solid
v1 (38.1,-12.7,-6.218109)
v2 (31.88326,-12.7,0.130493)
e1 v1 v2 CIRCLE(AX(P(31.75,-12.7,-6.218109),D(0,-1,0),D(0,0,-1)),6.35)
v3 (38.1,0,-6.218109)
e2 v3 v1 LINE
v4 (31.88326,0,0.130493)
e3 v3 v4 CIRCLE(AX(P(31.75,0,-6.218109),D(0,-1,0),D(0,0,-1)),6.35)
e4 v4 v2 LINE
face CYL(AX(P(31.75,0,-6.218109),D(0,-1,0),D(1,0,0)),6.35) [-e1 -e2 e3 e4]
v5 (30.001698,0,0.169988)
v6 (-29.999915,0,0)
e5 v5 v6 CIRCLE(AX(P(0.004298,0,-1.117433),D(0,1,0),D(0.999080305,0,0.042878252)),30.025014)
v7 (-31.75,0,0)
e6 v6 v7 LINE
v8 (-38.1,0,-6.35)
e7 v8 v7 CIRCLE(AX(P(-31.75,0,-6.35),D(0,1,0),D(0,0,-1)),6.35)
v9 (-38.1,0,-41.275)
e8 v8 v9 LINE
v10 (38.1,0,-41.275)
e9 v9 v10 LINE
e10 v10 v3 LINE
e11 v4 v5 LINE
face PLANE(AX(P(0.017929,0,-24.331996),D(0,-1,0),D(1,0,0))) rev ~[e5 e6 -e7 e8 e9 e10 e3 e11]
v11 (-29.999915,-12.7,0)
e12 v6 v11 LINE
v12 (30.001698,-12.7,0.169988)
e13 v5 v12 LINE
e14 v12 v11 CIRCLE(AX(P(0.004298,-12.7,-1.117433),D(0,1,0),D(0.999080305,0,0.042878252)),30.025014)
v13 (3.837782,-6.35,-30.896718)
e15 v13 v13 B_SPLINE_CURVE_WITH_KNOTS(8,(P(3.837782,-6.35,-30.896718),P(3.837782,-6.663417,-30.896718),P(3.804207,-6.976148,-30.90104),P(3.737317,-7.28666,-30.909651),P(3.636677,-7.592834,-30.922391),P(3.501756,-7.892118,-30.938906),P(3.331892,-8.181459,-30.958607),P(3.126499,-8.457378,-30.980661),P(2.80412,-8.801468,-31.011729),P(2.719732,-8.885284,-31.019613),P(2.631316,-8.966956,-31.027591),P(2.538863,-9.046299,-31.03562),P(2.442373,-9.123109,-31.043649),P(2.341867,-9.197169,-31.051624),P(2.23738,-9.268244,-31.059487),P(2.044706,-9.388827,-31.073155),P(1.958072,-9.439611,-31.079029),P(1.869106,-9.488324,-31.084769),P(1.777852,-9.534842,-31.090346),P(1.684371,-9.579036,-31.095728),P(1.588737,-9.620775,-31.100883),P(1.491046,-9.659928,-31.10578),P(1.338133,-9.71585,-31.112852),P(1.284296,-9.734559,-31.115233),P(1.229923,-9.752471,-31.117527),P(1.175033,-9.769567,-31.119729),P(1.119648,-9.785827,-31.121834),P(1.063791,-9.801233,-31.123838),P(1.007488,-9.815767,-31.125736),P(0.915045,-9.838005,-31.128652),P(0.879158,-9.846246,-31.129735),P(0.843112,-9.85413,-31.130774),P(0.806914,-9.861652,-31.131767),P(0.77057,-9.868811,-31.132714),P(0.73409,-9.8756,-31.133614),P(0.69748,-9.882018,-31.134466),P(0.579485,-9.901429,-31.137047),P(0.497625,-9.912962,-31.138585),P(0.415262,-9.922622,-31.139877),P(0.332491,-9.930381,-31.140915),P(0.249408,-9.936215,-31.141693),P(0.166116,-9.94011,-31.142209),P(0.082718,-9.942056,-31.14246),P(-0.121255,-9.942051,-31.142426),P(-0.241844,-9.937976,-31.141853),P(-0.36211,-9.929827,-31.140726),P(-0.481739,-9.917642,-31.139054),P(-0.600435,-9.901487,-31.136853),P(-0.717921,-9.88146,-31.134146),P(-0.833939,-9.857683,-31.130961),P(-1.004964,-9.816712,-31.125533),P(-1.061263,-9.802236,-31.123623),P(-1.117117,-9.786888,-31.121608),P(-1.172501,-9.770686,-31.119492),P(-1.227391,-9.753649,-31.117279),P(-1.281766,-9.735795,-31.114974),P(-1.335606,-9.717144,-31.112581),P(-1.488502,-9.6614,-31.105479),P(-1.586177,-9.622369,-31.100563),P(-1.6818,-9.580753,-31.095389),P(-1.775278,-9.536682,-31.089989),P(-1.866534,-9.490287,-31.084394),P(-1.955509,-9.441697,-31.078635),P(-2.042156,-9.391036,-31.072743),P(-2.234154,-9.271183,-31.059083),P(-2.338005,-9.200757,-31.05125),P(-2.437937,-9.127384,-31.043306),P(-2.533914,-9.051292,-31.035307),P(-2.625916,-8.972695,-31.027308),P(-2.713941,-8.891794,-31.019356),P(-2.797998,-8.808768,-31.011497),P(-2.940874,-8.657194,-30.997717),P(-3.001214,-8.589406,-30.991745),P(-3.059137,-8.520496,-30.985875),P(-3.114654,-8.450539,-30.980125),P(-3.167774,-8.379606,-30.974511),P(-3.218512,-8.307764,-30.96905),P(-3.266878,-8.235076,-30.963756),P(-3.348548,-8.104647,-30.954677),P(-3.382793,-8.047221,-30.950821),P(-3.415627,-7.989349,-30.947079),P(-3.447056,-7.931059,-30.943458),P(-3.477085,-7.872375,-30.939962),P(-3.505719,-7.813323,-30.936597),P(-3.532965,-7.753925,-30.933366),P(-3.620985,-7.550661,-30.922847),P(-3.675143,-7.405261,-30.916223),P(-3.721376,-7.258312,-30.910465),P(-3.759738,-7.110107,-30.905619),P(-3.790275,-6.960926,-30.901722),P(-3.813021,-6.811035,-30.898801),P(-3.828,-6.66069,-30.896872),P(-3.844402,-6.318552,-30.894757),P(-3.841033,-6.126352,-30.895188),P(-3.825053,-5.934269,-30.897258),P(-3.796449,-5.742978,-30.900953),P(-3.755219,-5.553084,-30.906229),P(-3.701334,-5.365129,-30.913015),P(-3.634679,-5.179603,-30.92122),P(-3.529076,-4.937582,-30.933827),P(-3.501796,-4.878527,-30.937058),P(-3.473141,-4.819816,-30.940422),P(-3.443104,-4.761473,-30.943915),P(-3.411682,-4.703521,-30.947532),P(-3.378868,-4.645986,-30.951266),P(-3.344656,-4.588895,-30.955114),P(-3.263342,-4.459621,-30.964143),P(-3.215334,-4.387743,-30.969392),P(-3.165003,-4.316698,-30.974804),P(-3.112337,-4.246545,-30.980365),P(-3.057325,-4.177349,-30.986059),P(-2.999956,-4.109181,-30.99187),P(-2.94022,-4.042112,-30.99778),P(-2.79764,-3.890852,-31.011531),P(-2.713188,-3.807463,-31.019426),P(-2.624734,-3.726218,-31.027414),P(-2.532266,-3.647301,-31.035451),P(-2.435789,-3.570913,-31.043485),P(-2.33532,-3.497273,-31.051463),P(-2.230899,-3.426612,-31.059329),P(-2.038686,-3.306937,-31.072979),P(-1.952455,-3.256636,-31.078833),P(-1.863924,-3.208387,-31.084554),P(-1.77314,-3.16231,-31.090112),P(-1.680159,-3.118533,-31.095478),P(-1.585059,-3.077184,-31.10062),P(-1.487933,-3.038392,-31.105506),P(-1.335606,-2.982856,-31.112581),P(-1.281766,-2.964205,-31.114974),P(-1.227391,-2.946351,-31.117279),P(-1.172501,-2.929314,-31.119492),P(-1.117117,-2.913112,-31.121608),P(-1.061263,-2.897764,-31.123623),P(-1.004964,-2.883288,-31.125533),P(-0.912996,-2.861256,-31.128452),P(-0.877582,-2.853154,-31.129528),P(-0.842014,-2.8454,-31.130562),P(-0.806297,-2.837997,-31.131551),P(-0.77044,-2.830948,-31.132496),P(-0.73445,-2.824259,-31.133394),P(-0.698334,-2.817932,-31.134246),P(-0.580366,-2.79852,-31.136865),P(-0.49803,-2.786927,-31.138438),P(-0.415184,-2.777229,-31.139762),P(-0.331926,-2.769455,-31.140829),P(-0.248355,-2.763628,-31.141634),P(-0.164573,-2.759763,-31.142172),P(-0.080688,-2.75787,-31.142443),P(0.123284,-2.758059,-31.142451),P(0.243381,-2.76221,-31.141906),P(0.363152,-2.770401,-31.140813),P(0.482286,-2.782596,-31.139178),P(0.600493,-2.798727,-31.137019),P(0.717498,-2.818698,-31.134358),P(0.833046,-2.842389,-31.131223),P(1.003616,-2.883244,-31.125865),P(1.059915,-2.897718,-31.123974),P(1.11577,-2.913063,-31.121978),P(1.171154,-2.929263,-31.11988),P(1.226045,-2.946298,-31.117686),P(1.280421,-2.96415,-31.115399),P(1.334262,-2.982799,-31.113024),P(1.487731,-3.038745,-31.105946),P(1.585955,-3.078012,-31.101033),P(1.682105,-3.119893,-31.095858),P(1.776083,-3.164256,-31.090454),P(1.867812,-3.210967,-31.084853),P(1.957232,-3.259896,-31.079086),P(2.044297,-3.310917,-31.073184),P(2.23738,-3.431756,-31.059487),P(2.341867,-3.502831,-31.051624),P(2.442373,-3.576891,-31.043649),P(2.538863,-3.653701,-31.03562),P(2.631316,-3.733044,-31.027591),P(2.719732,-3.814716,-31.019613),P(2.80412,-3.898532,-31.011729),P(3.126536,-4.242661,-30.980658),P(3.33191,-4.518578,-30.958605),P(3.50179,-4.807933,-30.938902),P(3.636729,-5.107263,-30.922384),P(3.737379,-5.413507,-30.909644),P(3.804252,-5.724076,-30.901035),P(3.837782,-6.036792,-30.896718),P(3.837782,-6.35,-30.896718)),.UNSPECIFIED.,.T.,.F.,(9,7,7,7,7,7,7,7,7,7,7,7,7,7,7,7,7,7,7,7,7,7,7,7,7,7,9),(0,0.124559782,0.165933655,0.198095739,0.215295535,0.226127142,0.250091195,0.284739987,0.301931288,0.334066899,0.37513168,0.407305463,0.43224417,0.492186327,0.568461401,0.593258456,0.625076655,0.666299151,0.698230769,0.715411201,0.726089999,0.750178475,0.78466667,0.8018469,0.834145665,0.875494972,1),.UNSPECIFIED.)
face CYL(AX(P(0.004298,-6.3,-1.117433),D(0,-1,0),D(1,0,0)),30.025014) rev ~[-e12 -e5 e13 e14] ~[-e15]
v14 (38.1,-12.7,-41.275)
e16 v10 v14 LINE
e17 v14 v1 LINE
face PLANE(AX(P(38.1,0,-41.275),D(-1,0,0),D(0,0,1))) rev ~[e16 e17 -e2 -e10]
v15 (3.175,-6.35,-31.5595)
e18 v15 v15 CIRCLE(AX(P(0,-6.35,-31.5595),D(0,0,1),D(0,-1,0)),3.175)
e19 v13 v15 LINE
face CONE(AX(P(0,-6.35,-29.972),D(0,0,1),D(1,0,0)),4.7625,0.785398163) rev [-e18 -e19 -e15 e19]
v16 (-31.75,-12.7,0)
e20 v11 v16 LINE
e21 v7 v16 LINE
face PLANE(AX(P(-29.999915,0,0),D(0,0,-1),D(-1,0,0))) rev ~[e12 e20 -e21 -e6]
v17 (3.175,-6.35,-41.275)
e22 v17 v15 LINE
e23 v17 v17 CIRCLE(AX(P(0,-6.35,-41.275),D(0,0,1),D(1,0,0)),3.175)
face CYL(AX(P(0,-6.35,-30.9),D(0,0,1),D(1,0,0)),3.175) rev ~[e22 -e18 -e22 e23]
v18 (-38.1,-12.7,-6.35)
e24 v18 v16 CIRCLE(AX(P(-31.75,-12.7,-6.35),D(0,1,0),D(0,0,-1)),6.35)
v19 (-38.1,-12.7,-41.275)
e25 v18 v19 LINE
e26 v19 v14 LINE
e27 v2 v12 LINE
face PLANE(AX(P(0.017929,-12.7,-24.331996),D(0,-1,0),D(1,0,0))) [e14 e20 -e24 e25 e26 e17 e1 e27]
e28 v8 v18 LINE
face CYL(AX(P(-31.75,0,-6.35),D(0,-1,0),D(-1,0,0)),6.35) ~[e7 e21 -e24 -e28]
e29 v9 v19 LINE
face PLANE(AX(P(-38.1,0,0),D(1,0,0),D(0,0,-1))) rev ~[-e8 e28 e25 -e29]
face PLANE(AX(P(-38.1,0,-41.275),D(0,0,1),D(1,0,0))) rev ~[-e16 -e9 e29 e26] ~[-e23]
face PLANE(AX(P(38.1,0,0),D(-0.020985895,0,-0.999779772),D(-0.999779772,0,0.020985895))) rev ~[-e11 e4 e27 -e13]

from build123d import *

# Parameters (mm, degrees)
F1_DEPTH    = 12.7
F3_R        = 4.7625
F4_DEPTH    = 6.35
F5_R        = 3.175
F6_DEPTH    = 12.7
F7_S5_R     = 30.0250138604
F7_T6_DEPTH = 8
F7_S7_R     = 3.175
F7_T8_DEPTH = 8
F8_R        = 6.35


# Not quite as in the source:
# - a fillet or chamfer that OpenCascade refuses, or shapes differently, is made with other operations: its cross-section is extruded or revolved along the edge and cut away or added


with BuildPart() as f1:
    # F0 (on Front) → F1 (new body)
    with BuildSketch(Plane.XZ):
        with BuildLine():
            Line((-38.1, 0), (-38.1, -41.275))
            Line((-38.1, -41.275), (38.1, -41.275))
            Line((38.1, -41.275), (38.1, 0))
            Line((38.1, 0), (30.0016984668, 0.169987541))
            ThreePointArc((30.0016984668, 0.169987541), (0.0893604764, -31.1423259445), (-29.9999146, 0))
            Line((-29.9999146, 0), (-38.1, 0))
        make_face()
    extrude(amount=F1_DEPTH)

    # F3 (on offset) → F4 (cut)
    with BuildSketch(Plane.XY.offset(-25.4)):
        with Locations((0, -6.35)):
            Circle(F3_R)
    extrude(amount=-F4_DEPTH, mode=Mode.SUBTRACT)

    # F5 (on face) → F6 (cut)
    with BuildSketch(Plane.XY.offset(-31.75)):
        with Locations((0, -6.35)):
            Circle(F5_R)
    extrude(amount=-F6_DEPTH, mode=Mode.SUBTRACT)

    # F7: chamfer of 1.778 on 1 edges, made by hand


with BuildPart() as f7_tool2:
    # F7_s3 → F7_t4 (revolve)
    with BuildSketch(Plane.XZ.offset(6.35)):
        Polygon((4.7625, -29.972), (2.9845, -31.75), (4.7625, -31.75), align=None)
    revolve(axis=Axis((0, -6.35, -31.75), (0, 0, 1)))

    # F7_s5 → F7_t6 (cut, symmetric)
    with BuildSketch(Plane.XZ.offset(6.3)):
        with Locations((0.0042984668, -1.1174325763)):
            Circle(F7_S5_R)
    extrude(amount=F7_T6_DEPTH, both=True, mode=Mode.SUBTRACT)

    # F7_s7 → F7_t8 (cut, symmetric)
    with BuildSketch(Plane.XY.offset(-30.9)):
        with Locations((0, -6.35)):
            Circle(F7_S7_R)
    extrude(amount=F7_T8_DEPTH, both=True, mode=Mode.SUBTRACT)


with BuildPart() as f1_1:
    add(f1.part)

    # F7_t1: union F7_tool2
    add(f7_tool2.part)

    # F8
    f8_edges = [f1_1.edges().sort_by_distance(p)[0] for p in [
        (-38.1, -6.35, 0),
        (38.1, -6.35, 0),
    ]]
    fillet(f8_edges, radius=F8_R)


solid = f1_1.part
